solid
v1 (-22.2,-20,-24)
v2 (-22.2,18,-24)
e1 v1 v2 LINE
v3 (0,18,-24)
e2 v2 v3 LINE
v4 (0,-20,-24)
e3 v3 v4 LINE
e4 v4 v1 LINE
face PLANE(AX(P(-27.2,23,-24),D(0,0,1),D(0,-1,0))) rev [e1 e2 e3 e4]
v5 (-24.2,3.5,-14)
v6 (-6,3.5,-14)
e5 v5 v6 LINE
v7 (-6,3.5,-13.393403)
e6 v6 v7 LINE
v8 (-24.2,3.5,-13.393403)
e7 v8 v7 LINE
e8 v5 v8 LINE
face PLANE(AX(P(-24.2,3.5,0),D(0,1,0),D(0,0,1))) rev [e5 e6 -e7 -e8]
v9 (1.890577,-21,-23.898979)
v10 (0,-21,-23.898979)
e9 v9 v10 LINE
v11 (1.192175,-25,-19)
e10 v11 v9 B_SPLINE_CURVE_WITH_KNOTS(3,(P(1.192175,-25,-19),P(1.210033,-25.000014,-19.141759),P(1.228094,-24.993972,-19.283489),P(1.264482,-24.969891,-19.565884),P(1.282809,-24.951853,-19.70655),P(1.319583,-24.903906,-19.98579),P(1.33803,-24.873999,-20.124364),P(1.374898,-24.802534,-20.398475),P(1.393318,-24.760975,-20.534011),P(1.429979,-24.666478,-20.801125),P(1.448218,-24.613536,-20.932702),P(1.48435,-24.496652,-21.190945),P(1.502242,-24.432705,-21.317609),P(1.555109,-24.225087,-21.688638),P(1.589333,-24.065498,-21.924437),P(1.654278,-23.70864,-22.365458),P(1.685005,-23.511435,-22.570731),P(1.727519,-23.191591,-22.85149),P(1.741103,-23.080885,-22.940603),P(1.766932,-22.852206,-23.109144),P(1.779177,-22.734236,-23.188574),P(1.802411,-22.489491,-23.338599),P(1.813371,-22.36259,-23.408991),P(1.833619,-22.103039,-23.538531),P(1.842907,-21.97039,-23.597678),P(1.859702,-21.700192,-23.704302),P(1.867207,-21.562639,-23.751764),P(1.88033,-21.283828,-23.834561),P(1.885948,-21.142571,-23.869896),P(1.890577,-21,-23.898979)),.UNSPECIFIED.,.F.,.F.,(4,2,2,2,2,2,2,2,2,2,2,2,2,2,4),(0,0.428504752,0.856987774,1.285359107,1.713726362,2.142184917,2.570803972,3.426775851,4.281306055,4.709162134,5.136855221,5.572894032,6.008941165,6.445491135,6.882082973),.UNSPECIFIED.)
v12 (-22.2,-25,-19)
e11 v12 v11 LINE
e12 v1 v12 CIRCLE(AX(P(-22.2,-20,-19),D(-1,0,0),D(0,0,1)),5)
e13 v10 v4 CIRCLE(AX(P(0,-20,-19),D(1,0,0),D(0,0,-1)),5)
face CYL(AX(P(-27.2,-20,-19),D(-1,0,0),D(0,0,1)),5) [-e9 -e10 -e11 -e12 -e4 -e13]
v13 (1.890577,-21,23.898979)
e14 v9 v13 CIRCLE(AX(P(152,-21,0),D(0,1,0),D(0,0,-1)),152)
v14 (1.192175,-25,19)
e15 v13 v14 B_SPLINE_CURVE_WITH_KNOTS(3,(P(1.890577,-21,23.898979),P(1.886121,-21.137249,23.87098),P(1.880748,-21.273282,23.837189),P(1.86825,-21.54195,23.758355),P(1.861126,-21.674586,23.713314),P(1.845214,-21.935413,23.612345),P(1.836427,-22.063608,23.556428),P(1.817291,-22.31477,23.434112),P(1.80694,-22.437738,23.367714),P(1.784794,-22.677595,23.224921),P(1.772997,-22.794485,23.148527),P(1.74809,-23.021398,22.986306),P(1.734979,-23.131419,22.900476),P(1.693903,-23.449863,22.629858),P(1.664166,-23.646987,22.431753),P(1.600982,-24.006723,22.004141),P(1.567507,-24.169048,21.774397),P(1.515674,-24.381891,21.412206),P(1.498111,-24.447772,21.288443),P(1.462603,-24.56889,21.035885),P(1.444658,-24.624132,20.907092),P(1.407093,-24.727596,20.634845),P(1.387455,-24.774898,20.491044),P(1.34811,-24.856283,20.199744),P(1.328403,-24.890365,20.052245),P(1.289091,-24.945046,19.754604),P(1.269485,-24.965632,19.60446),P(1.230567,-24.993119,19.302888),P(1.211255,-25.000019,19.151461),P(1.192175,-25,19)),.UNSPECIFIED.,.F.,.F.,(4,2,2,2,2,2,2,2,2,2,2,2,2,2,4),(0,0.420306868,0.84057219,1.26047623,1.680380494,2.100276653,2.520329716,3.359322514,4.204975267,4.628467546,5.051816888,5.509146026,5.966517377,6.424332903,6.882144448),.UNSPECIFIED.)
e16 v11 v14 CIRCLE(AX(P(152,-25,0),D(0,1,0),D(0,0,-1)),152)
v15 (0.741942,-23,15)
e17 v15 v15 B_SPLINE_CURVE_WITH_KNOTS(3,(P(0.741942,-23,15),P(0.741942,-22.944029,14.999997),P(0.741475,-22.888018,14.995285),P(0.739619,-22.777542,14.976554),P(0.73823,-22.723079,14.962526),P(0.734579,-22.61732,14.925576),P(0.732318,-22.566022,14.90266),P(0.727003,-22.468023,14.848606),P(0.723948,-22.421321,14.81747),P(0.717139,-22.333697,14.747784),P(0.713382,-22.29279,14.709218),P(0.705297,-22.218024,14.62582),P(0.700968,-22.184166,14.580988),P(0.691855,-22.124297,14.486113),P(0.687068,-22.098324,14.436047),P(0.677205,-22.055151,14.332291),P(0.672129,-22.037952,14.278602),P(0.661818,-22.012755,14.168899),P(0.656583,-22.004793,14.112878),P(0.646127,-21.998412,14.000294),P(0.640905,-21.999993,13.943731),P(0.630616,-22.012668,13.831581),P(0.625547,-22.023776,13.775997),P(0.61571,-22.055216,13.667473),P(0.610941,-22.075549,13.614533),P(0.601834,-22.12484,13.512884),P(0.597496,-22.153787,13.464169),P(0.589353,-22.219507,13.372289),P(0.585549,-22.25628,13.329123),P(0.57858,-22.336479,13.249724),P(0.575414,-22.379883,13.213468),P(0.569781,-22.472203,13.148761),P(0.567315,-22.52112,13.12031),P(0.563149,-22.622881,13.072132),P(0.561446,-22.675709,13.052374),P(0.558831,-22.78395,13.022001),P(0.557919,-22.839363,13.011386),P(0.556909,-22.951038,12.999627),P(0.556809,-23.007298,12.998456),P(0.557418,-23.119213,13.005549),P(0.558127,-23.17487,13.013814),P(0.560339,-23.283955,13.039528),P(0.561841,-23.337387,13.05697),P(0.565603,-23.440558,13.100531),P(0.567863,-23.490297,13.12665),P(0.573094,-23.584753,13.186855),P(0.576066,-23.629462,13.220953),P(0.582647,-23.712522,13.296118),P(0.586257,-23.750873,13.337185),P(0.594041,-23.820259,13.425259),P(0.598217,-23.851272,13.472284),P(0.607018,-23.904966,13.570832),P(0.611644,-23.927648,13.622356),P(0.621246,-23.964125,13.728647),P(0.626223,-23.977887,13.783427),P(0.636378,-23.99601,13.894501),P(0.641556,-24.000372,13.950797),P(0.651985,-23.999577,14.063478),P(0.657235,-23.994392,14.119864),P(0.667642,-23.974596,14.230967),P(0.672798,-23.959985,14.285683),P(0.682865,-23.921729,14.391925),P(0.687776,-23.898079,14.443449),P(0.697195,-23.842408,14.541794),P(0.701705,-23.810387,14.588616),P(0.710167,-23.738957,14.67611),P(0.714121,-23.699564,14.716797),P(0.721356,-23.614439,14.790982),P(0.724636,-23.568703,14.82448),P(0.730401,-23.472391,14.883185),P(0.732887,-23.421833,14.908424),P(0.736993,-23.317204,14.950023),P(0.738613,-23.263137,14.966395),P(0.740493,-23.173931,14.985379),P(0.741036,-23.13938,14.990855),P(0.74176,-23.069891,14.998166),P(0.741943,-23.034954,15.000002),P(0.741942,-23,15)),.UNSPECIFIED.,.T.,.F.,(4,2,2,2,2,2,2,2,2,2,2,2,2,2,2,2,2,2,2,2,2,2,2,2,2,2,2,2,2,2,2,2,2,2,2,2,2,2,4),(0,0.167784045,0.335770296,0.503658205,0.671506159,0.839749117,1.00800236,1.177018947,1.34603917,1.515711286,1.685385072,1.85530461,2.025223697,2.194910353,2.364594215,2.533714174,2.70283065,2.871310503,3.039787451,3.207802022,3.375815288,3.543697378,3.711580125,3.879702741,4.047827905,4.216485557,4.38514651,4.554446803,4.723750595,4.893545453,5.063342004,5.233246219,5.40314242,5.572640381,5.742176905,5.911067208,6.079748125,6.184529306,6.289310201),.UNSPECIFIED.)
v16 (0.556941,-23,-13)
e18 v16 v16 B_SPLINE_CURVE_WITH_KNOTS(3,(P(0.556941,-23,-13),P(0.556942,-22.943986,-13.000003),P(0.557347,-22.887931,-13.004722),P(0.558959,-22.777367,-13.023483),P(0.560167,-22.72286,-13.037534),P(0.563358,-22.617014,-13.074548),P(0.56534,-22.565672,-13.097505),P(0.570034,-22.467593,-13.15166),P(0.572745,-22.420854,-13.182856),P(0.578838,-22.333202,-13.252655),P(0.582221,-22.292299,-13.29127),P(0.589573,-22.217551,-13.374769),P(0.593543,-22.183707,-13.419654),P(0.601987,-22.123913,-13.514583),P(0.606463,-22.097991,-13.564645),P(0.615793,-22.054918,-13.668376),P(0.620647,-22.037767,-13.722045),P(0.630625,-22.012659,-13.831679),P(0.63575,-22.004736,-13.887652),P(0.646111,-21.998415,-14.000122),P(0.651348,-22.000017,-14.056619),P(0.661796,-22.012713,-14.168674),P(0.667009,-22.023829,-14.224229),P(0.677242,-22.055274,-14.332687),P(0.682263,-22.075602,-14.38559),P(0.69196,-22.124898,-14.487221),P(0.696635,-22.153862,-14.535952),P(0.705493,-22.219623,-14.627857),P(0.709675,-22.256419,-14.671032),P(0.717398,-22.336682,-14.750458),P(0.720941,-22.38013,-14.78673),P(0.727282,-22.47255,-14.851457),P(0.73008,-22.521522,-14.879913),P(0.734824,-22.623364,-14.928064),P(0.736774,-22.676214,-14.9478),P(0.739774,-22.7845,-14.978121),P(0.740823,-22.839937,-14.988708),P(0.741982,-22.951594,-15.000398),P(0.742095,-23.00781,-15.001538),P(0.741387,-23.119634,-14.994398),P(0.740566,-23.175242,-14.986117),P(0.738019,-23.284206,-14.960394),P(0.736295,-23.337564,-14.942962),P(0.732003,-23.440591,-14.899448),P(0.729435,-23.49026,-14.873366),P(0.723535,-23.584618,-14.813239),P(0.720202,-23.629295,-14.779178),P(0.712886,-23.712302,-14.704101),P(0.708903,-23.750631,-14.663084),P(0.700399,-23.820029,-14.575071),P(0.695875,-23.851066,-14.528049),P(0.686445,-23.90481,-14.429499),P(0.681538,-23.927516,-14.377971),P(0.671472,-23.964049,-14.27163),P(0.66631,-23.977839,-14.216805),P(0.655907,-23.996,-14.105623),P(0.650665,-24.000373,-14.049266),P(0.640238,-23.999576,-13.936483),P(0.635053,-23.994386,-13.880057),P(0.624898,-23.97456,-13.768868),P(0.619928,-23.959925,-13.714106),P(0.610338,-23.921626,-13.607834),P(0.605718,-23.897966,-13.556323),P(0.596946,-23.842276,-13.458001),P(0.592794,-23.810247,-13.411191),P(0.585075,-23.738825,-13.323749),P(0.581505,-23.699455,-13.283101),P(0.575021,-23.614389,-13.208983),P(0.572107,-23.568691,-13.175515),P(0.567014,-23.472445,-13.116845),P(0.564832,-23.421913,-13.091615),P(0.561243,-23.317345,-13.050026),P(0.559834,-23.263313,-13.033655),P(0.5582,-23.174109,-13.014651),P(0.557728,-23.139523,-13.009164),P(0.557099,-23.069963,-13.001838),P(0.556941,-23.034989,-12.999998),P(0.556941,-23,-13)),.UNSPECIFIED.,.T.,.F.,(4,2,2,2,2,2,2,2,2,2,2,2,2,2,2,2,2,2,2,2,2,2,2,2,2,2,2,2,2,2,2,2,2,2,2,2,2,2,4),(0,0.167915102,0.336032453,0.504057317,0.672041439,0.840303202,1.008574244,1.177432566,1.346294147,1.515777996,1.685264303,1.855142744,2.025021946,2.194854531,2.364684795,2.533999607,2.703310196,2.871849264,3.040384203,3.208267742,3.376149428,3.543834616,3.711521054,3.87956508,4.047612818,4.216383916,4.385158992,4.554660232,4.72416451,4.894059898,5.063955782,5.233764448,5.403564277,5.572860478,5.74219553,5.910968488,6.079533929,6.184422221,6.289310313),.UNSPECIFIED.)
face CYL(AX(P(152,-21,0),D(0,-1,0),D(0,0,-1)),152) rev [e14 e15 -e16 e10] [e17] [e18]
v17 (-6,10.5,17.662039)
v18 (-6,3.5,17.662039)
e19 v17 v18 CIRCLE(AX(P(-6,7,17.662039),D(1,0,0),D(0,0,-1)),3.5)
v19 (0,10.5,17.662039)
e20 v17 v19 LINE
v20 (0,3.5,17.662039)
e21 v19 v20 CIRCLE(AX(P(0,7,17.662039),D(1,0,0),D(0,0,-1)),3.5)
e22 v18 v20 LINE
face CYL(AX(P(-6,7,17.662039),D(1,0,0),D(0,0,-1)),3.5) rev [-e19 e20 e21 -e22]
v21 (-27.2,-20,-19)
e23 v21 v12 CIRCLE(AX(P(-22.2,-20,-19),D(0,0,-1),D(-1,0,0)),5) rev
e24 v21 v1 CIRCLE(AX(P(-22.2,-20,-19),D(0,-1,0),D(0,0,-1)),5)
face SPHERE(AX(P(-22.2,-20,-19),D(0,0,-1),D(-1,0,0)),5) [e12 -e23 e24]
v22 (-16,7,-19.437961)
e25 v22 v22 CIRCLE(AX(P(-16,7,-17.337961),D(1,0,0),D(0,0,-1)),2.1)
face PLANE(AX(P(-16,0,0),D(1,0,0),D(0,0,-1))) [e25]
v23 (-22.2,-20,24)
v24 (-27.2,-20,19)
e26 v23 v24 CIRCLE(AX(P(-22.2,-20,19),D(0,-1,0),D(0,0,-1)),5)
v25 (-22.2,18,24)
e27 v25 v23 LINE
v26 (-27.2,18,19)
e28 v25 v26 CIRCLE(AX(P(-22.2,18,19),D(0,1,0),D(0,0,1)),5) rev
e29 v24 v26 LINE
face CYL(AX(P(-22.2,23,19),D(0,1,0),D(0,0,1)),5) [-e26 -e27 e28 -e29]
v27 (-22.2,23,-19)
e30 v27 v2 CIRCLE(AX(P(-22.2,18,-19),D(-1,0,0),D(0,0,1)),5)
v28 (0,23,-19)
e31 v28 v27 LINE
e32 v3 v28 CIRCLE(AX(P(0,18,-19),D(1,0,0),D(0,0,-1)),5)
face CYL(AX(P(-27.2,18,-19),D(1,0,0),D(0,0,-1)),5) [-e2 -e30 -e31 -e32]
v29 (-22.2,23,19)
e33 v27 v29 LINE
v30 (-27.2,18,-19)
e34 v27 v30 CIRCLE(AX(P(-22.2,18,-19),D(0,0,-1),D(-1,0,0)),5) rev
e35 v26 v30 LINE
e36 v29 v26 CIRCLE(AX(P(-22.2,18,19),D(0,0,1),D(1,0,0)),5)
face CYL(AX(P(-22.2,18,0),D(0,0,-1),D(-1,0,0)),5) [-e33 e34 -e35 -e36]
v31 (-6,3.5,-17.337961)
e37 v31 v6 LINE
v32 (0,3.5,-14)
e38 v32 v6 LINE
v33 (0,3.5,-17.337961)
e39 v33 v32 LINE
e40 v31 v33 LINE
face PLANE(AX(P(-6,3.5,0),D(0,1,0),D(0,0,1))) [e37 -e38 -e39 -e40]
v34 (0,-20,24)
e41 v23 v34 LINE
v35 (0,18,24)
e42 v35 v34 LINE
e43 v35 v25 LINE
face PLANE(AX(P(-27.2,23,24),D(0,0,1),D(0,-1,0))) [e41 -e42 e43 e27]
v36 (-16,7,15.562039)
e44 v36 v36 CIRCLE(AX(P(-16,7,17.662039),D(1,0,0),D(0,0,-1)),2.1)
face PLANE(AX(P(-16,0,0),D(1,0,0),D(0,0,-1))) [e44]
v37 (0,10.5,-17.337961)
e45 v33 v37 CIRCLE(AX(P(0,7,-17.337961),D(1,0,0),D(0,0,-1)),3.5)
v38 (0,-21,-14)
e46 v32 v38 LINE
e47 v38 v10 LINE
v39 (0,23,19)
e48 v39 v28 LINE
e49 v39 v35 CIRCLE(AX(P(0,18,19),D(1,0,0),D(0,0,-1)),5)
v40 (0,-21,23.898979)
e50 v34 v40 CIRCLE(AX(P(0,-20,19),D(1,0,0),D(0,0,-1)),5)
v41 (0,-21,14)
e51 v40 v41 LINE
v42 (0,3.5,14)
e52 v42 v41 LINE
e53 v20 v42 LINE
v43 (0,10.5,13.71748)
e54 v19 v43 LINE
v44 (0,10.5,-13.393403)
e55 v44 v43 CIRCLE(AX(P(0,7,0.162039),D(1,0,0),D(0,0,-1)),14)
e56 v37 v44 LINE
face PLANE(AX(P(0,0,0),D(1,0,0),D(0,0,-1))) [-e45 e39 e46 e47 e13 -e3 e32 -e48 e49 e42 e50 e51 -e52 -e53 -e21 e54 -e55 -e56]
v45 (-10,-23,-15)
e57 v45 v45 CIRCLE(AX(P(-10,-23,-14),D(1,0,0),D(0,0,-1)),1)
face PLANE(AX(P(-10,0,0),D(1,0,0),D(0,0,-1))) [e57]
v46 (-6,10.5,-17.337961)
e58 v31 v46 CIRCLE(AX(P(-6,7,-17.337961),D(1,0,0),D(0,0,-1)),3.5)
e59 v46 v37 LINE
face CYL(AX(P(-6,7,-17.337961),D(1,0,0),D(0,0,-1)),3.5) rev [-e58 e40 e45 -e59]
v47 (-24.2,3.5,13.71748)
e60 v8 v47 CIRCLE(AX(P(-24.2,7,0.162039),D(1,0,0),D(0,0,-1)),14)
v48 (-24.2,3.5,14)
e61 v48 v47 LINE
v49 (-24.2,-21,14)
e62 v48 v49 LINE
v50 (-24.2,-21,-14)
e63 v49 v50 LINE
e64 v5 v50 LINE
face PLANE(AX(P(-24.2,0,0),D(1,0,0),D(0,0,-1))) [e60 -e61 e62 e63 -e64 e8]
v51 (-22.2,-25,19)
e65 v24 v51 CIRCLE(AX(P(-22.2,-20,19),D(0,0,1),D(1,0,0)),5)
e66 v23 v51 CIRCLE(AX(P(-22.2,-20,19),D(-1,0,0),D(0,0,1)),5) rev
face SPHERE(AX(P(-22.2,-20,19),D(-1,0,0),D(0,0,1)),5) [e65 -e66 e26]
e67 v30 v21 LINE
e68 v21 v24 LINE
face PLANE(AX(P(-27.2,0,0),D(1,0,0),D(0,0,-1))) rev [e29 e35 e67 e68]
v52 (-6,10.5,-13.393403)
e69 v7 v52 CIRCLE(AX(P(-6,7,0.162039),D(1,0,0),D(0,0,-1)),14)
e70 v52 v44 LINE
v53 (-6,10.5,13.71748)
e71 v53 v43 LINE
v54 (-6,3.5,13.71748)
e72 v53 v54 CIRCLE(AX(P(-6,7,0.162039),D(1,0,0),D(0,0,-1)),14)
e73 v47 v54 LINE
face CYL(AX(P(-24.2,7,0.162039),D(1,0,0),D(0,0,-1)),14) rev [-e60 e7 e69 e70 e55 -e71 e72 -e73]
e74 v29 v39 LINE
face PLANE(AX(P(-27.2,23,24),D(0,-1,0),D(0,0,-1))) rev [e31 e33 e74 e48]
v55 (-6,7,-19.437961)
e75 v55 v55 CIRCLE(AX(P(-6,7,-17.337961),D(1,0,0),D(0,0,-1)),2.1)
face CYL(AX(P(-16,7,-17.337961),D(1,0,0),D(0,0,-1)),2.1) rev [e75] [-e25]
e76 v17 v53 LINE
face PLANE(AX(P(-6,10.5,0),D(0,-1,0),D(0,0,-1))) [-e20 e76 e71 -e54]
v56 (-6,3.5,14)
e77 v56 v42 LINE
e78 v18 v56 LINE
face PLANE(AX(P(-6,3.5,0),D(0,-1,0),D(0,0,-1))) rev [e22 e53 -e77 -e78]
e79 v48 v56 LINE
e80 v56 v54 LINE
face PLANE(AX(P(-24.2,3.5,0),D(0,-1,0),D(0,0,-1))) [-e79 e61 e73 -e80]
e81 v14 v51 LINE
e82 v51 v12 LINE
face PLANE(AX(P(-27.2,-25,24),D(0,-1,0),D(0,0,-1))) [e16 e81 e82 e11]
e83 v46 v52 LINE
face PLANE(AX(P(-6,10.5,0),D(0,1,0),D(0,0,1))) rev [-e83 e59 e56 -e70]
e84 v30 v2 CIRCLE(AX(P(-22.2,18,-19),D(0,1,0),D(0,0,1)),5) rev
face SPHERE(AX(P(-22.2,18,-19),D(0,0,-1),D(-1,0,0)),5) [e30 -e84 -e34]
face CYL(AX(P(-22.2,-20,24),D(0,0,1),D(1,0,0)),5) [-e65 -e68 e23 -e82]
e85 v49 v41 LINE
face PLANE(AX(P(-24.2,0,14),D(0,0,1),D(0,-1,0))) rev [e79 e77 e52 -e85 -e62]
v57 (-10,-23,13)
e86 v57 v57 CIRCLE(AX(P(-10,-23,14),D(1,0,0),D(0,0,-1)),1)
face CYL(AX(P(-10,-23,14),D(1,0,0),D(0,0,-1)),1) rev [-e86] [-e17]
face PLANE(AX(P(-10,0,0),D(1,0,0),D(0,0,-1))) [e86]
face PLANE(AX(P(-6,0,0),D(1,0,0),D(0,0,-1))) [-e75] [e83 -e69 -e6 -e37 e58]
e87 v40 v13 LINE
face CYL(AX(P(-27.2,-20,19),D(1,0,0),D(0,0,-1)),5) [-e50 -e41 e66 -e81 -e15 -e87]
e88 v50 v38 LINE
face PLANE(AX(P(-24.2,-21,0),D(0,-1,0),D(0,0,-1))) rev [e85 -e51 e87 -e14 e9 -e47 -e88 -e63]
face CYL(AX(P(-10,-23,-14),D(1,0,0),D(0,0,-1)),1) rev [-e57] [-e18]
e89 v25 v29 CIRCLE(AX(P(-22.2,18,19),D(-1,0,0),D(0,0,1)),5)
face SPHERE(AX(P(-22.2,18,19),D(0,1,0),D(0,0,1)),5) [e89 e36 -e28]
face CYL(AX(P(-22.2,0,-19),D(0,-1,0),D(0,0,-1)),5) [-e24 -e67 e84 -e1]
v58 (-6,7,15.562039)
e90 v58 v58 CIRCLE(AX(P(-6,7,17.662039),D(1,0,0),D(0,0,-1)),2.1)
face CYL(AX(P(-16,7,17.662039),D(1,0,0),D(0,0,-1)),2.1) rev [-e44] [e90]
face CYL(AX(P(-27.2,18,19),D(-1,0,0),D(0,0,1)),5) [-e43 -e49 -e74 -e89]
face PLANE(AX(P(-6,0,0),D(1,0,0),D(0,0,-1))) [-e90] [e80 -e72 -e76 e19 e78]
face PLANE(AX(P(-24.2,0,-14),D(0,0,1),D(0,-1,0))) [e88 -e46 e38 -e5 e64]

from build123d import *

# Parameters (mm, degrees)
ESQUISSE1_W             = 48
ESQUISSE1_H             = 48
BOSS_EXTRU_1_DEPTH      = 27.2
ESQUISSE1_5_R           = 3.120993446
ENL_V_MAT_EXTRU_1_DEPTH = 24.2
ESQUISSE1_6_R           = 2.1
ENL_V_MAT_EXTRU_2_DEPTH = 6
ESQUISSE1_8_R           = 2.1
ENL_V_MAT_EXTRU_3_DEPTH = 16
BOSS_EXTRU_3_DEPTH      = 4
ESQUISSE1_9_R           = 1
ENL_V_MAT_EXTRU_4_DEPTH = 10
ENL_V_START             = 10
ESQUISSE1_10_R          = 1
ENL_V_MAT_EXTRU_5_DEPTH = 10
CONG_1_R                = 5


with BuildPart() as part:
    # Esquisse1 → Boss.-Extru.1 (new body)
    with BuildSketch(Plane(origin=(0, 0, 0), x_dir=(0, 0, -1), z_dir=(1, 0, 0))):
        with Locations((0, -1)):
            Rectangle(ESQUISSE1_W, ESQUISSE1_H)
    extrude(amount=-BOSS_EXTRU_1_DEPTH)

    # Esquisse1<5> → Enlèv. mat.-Extru.1 (cut)
    # profile 1 of 4: a face of its own
    with BuildSketch(Plane(origin=(0, 0, 0), x_dir=(0, 0, -1), z_dir=(1, 0, 0))):
        with BuildLine():
            ThreePointArc((-14.162038672, 7), (-14.05045442, 5.235939905), (-13.717480384, 3.5))
            ThreePointArc((-13.717480384, 3.5), (-0.162038672, -7), (13.39340304, 3.5))
            ThreePointArc((13.39340304, 3.5), (13.726377076, 5.235939905), (13.837961328, 7))
            Line((13.837961328, 7), (-14.162038672, 7))
        make_face()
    # profile 2 of 4: a face of its own
    with BuildSketch(Plane(origin=(0, 0, 0), x_dir=(0, 0, -1), z_dir=(1, 0, 0))):
        with BuildLine():
            ThreePointArc((13.39340304, 10.5), (8.411175453, 18.067971791), (-0.162038609, 21))
            ThreePointArc((-0.162038609, 21), (-8.735252747, 18.06797183), (-13.717480384, 10.5))
            ThreePointArc((-13.717480384, 10.5), (-14.05045442, 8.764060095), (-14.162038672, 7))
            Line((-14.162038672, 7), (13.837961328, 7))
            ThreePointArc((13.837961328, 7), (13.726377076, 8.764060095), (13.39340304, 10.5))
        make_face()
        with Locations((0, 15)):
            Circle(ESQUISSE1_5_R, mode=Mode.SUBTRACT)
    # profile 3 of 4: a face of its own
    with BuildSketch(Plane(origin=(0, 0, 0), x_dir=(0, 0, -1), z_dir=(1, 0, 0))):
        with BuildLine():
            Line((-14, 3.5), (-14, -21))
            Line((-14, -21), (14, -21))
            Line((14, -21), (14, 3.5))
            Line((14, 3.5), (13.39340304, 3.5))
            ThreePointArc((13.39340304, 3.5), (-0.162038672, -7), (-13.717480384, 3.5))
            Line((-13.717480384, 3.5), (-14, 3.5))
        make_face()
    # profile 4 of 4: a face of its own
    with BuildSketch(Plane(origin=(0, 0, 0), x_dir=(0, 0, -1), z_dir=(1, 0, 0))):
        with Locations((0, 15)):
            Circle(ESQUISSE1_5_R)
    extrude(amount=-ENL_V_MAT_EXTRU_1_DEPTH, mode=Mode.SUBTRACT)

    # Esquisse1<6> → Enlèv. mat.-Extru.2 (cut)
    # profile 1 of 4: a face of its own
    with BuildSketch(Plane(origin=(0, 0, 0), x_dir=(0, 0, -1), z_dir=(1, 0, 0))):
        with BuildLine():
            Line((-17.662038672, 3.5), (-14, 3.5))
            Line((-14, 3.5), (-13.717480384, 3.5))
            ThreePointArc((-13.717480384, 3.5), (-14.05045442, 5.235939905), (-14.162038672, 7))
            ThreePointArc((-14.162038672, 7), (-14.05045442, 8.764060095), (-13.717480384, 10.5))
            Line((-13.717480384, 10.5), (-17.662038672, 10.5))
            ThreePointArc((-17.662038672, 10.5), (-21.162038672, 7), (-17.662038672, 3.5))
        make_face()
        with Locations((-17.662038672, 7)):
            Circle(ESQUISSE1_6_R, mode=Mode.SUBTRACT)
    # profile 2 of 4: a face of its own
    with BuildSketch(Plane(origin=(0, 0, 0), x_dir=(0, 0, -1), z_dir=(1, 0, 0))):
        with Locations((-17.662038672, 7)):
            Circle(ESQUISSE1_6_R)
    # profile 3 of 4: a face of its own
    with BuildSketch(Plane(origin=(0, 0, 0), x_dir=(0, 0, -1), z_dir=(1, 0, 0))):
        with BuildLine():
            Line((13.39340304, 3.5), (14, 3.5))
            Line((14, 3.5), (17.337961328, 3.5))
            ThreePointArc((17.337961328, 3.5), (20.837961328, 7), (17.337961328, 10.5))
            Line((17.337961328, 10.5), (13.39340304, 10.5))
            ThreePointArc((13.39340304, 10.5), (13.726377076, 8.764060095), (13.837961328, 7))
            ThreePointArc((13.837961328, 7), (13.726377076, 5.235939905), (13.39340304, 3.5))
        make_face()
        with Locations((17.337961328, 7)):
            Circle(ESQUISSE1_6_R, mode=Mode.SUBTRACT)
    # profile 4 of 4: a face of its own
    with BuildSketch(Plane(origin=(0, 0, 0), x_dir=(0, 0, -1), z_dir=(1, 0, 0))):
        with Locations((17.337961328, 7)):
            Circle(ESQUISSE1_6_R)
    extrude(amount=-ENL_V_MAT_EXTRU_2_DEPTH, mode=Mode.SUBTRACT)

    # Esquisse1<8> → Enlèv. mat.-Extru.3 (cut)
    with BuildSketch(Plane(origin=(0, 0, 0), x_dir=(0, 0, -1), z_dir=(1, 0, 0))):
        with Locations((-17.662038672, 7)):
            Circle(ESQUISSE1_8_R)
        with Locations((17.337961328, 7)):
            Circle(ESQUISSE1_8_R)
    extrude(amount=-ENL_V_MAT_EXTRU_3_DEPTH, mode=Mode.SUBTRACT)

    # Esquisse2 → Boss.-Extru.3 (add)
    with BuildSketch(Plane.XZ.offset(25)):
        with BuildLine():
            Line((0, 24), (1.906695686, 24))
            ThreePointArc((1.906695686, 24), (0, 0), (1.906695686, -24))
            Line((1.906695686, -24), (0, -24))
            Line((0, -24), (-1.50393066, -24))
            Line((-1.50393066, -24), (-1.50393066, 24))
            Line((-1.50393066, 24), (0, 24))
        make_face()
    extrude(amount=-BOSS_EXTRU_3_DEPTH)

    # Esquisse1<9> → Enlèv. mat.-Extru.4 (cut)
    with BuildSketch(Plane(origin=(0, 0, 0), x_dir=(0, 0, -1), z_dir=(1, 0, 0))):
        with Locations((-14, -23)):
            Circle(ESQUISSE1_9_R)
        with Locations((14, -23)):
            Circle(ESQUISSE1_9_R)
    extrude(amount=-ENL_V_MAT_EXTRU_4_DEPTH, mode=Mode.SUBTRACT)

    # Esquisse1<10> → Enlèv. mat.-Extru.5 (cut)
    with BuildSketch(Plane(origin=(0, 0, 0), x_dir=(0, 0, -1), z_dir=(1, 0, 0)).offset(ENL_V_START)):
        with Locations((-14, -23)):
            Circle(ESQUISSE1_10_R)
        with Locations((14, -23)):
            Circle(ESQUISSE1_10_R)
    extrude(amount=-ENL_V_MAT_EXTRU_5_DEPTH, mode=Mode.SUBTRACT)

    # Congé1
    # the kernel refuses this fillet: 5 mm, written as the material it takes off along each edge
    with BuildSketch(Plane(origin=(-22.2, -20, 19), x_dir=(0, -1, 0), z_dir=(-1, 0, 0))) as cong_1_piece_1_section:
        Polygon((0, 0), (CONG_1_R, 0), (CONG_1_R, CONG_1_R), (0, CONG_1_R), align=None)
    cong_1_piece_1 = extrude(amount=CONG_1_R, mode=Mode.PRIVATE)
    cong_1_piece_1 = cong_1_piece_1 - Plane(origin=(-22.2, -20, 19), x_dir=(0, 0.7071067811865477, -0.7071067811865475), z_dir=(-1, 0, 0)) * Sphere(CONG_1_R, mode=Mode.PRIVATE)
    add(cong_1_piece_1, mode=Mode.SUBTRACT)
    with BuildSketch(Plane(origin=(-22.2, -20, -19), x_dir=(0, -1, 0), z_dir=(-1, 0, 0))) as cong_1_piece_2_section:
        Polygon((0, 0), (CONG_1_R, 0), (CONG_1_R, -CONG_1_R), (0, -CONG_1_R), align=None)
    cong_1_piece_2 = extrude(amount=CONG_1_R, mode=Mode.PRIVATE)
    cong_1_piece_2 = cong_1_piece_2 - Plane(origin=(-22.2, -20, -19), x_dir=(0, 0.7071067811865475, 0.7071067811865476), z_dir=(-1, 0, 0)) * Sphere(CONG_1_R, mode=Mode.PRIVATE)
    add(cong_1_piece_2, mode=Mode.SUBTRACT)
    with BuildSketch(Plane(origin=(-22.2, 18, -19), x_dir=(-1, 0, 0), z_dir=(0, 1, 0))) as cong_1_piece_3_section:
        Polygon((0, 0), (CONG_1_R, 0), (CONG_1_R, -CONG_1_R), (0, -CONG_1_R), align=None)
    cong_1_piece_3 = extrude(amount=CONG_1_R, mode=Mode.PRIVATE)
    cong_1_piece_3 = cong_1_piece_3 - Plane(origin=(-22.2, 18, -19), x_dir=(0.7071067811865475, 0, 0.7071067811865475), z_dir=(0, 1, 0)) * Sphere(CONG_1_R, mode=Mode.PRIVATE)
    add(cong_1_piece_3, mode=Mode.SUBTRACT)
    with BuildSketch(Plane(origin=(-22.2, 18, 19), x_dir=(-1, 0, 0), z_dir=(0, 1, 0))) as cong_1_piece_4_section:
        Polygon((0, 0), (CONG_1_R, 0), (CONG_1_R, CONG_1_R), (0, CONG_1_R), align=None)
    cong_1_piece_4 = extrude(amount=CONG_1_R, mode=Mode.PRIVATE)
    cong_1_piece_4 = cong_1_piece_4 - Plane(origin=(-22.2, 18, 19), x_dir=(0.7071067811865475, 0, -0.7071067811865475), z_dir=(0, 1, 0)) * Sphere(CONG_1_R, mode=Mode.PRIVATE)
    add(cong_1_piece_4, mode=Mode.SUBTRACT)
    with BuildSketch(Plane(origin=(-22.2, -25, 24), x_dir=(0, 0, -1), z_dir=(1, 0, 0)), Plane(origin=(14.406695686, -25, -24), x_dir=(0, 0, 1), z_dir=(-1, 0, 0))) as cong_1_piece_5:
        with BuildLine():
            CenterArc((CONG_1_R, CONG_1_R), CONG_1_R, 180, 90)
            Line((0, CONG_1_R), (0, 0))
            Line((0, 0), (CONG_1_R, 0))
        make_face()
    extrude(amount=36.606695686, mode=Mode.SUBTRACT)
    with BuildSketch(Plane(origin=(-27.2, -25, -19), x_dir=(0, 1, 0), z_dir=(0, 0, 1)), Plane(origin=(-27.2, 18, -24), x_dir=(0, 0, 1), z_dir=(0, -1, 0)), Plane(origin=(-27.2, -20, 24), x_dir=(0, 0, -1), z_dir=(0, 1, 0))) as cong_1_piece_6:
        with BuildLine():
            CenterArc((CONG_1_R, -CONG_1_R), CONG_1_R, 90, 90)
            Line((0, -CONG_1_R), (0, 0))
            Line((0, 0), (CONG_1_R, 0))
        make_face()
    extrude(amount=38, mode=Mode.SUBTRACT)
    with BuildSketch(Plane(origin=(12.5, 23, -24), x_dir=(0, 0, 1), z_dir=(-1, 0, 0))) as cong_1_piece_7:
        with BuildLine():
            CenterArc((CONG_1_R, -CONG_1_R), CONG_1_R, 90, 90)
            Line((0, -CONG_1_R), (0, 0))
            Line((0, 0), (CONG_1_R, 0))
        make_face()
    extrude(amount=34.7, mode=Mode.SUBTRACT)
    with BuildSketch(Plane(origin=(-27.2, 23, 19), x_dir=(1, 0, 0), z_dir=(0, 0, -1))) as cong_1_piece_8:
        with BuildLine():
            CenterArc((CONG_1_R, CONG_1_R), CONG_1_R, 180, 90)
            Line((0, CONG_1_R), (0, 0))
            Line((0, 0), (CONG_1_R, 0))
        make_face()
    extrude(amount=38, mode=Mode.SUBTRACT)
    with BuildSketch(Plane(origin=(12.5, 23, 24), x_dir=(0, 0, -1), z_dir=(-1, 0, 0))) as cong_1_piece_9:
        with BuildLine():
            CenterArc((CONG_1_R, CONG_1_R), CONG_1_R, 180, 90)
            Line((0, CONG_1_R), (0, 0))
            Line((0, 0), (CONG_1_R, 0))
        make_face()
    extrude(amount=34.7, mode=Mode.SUBTRACT)


solid = part.part
